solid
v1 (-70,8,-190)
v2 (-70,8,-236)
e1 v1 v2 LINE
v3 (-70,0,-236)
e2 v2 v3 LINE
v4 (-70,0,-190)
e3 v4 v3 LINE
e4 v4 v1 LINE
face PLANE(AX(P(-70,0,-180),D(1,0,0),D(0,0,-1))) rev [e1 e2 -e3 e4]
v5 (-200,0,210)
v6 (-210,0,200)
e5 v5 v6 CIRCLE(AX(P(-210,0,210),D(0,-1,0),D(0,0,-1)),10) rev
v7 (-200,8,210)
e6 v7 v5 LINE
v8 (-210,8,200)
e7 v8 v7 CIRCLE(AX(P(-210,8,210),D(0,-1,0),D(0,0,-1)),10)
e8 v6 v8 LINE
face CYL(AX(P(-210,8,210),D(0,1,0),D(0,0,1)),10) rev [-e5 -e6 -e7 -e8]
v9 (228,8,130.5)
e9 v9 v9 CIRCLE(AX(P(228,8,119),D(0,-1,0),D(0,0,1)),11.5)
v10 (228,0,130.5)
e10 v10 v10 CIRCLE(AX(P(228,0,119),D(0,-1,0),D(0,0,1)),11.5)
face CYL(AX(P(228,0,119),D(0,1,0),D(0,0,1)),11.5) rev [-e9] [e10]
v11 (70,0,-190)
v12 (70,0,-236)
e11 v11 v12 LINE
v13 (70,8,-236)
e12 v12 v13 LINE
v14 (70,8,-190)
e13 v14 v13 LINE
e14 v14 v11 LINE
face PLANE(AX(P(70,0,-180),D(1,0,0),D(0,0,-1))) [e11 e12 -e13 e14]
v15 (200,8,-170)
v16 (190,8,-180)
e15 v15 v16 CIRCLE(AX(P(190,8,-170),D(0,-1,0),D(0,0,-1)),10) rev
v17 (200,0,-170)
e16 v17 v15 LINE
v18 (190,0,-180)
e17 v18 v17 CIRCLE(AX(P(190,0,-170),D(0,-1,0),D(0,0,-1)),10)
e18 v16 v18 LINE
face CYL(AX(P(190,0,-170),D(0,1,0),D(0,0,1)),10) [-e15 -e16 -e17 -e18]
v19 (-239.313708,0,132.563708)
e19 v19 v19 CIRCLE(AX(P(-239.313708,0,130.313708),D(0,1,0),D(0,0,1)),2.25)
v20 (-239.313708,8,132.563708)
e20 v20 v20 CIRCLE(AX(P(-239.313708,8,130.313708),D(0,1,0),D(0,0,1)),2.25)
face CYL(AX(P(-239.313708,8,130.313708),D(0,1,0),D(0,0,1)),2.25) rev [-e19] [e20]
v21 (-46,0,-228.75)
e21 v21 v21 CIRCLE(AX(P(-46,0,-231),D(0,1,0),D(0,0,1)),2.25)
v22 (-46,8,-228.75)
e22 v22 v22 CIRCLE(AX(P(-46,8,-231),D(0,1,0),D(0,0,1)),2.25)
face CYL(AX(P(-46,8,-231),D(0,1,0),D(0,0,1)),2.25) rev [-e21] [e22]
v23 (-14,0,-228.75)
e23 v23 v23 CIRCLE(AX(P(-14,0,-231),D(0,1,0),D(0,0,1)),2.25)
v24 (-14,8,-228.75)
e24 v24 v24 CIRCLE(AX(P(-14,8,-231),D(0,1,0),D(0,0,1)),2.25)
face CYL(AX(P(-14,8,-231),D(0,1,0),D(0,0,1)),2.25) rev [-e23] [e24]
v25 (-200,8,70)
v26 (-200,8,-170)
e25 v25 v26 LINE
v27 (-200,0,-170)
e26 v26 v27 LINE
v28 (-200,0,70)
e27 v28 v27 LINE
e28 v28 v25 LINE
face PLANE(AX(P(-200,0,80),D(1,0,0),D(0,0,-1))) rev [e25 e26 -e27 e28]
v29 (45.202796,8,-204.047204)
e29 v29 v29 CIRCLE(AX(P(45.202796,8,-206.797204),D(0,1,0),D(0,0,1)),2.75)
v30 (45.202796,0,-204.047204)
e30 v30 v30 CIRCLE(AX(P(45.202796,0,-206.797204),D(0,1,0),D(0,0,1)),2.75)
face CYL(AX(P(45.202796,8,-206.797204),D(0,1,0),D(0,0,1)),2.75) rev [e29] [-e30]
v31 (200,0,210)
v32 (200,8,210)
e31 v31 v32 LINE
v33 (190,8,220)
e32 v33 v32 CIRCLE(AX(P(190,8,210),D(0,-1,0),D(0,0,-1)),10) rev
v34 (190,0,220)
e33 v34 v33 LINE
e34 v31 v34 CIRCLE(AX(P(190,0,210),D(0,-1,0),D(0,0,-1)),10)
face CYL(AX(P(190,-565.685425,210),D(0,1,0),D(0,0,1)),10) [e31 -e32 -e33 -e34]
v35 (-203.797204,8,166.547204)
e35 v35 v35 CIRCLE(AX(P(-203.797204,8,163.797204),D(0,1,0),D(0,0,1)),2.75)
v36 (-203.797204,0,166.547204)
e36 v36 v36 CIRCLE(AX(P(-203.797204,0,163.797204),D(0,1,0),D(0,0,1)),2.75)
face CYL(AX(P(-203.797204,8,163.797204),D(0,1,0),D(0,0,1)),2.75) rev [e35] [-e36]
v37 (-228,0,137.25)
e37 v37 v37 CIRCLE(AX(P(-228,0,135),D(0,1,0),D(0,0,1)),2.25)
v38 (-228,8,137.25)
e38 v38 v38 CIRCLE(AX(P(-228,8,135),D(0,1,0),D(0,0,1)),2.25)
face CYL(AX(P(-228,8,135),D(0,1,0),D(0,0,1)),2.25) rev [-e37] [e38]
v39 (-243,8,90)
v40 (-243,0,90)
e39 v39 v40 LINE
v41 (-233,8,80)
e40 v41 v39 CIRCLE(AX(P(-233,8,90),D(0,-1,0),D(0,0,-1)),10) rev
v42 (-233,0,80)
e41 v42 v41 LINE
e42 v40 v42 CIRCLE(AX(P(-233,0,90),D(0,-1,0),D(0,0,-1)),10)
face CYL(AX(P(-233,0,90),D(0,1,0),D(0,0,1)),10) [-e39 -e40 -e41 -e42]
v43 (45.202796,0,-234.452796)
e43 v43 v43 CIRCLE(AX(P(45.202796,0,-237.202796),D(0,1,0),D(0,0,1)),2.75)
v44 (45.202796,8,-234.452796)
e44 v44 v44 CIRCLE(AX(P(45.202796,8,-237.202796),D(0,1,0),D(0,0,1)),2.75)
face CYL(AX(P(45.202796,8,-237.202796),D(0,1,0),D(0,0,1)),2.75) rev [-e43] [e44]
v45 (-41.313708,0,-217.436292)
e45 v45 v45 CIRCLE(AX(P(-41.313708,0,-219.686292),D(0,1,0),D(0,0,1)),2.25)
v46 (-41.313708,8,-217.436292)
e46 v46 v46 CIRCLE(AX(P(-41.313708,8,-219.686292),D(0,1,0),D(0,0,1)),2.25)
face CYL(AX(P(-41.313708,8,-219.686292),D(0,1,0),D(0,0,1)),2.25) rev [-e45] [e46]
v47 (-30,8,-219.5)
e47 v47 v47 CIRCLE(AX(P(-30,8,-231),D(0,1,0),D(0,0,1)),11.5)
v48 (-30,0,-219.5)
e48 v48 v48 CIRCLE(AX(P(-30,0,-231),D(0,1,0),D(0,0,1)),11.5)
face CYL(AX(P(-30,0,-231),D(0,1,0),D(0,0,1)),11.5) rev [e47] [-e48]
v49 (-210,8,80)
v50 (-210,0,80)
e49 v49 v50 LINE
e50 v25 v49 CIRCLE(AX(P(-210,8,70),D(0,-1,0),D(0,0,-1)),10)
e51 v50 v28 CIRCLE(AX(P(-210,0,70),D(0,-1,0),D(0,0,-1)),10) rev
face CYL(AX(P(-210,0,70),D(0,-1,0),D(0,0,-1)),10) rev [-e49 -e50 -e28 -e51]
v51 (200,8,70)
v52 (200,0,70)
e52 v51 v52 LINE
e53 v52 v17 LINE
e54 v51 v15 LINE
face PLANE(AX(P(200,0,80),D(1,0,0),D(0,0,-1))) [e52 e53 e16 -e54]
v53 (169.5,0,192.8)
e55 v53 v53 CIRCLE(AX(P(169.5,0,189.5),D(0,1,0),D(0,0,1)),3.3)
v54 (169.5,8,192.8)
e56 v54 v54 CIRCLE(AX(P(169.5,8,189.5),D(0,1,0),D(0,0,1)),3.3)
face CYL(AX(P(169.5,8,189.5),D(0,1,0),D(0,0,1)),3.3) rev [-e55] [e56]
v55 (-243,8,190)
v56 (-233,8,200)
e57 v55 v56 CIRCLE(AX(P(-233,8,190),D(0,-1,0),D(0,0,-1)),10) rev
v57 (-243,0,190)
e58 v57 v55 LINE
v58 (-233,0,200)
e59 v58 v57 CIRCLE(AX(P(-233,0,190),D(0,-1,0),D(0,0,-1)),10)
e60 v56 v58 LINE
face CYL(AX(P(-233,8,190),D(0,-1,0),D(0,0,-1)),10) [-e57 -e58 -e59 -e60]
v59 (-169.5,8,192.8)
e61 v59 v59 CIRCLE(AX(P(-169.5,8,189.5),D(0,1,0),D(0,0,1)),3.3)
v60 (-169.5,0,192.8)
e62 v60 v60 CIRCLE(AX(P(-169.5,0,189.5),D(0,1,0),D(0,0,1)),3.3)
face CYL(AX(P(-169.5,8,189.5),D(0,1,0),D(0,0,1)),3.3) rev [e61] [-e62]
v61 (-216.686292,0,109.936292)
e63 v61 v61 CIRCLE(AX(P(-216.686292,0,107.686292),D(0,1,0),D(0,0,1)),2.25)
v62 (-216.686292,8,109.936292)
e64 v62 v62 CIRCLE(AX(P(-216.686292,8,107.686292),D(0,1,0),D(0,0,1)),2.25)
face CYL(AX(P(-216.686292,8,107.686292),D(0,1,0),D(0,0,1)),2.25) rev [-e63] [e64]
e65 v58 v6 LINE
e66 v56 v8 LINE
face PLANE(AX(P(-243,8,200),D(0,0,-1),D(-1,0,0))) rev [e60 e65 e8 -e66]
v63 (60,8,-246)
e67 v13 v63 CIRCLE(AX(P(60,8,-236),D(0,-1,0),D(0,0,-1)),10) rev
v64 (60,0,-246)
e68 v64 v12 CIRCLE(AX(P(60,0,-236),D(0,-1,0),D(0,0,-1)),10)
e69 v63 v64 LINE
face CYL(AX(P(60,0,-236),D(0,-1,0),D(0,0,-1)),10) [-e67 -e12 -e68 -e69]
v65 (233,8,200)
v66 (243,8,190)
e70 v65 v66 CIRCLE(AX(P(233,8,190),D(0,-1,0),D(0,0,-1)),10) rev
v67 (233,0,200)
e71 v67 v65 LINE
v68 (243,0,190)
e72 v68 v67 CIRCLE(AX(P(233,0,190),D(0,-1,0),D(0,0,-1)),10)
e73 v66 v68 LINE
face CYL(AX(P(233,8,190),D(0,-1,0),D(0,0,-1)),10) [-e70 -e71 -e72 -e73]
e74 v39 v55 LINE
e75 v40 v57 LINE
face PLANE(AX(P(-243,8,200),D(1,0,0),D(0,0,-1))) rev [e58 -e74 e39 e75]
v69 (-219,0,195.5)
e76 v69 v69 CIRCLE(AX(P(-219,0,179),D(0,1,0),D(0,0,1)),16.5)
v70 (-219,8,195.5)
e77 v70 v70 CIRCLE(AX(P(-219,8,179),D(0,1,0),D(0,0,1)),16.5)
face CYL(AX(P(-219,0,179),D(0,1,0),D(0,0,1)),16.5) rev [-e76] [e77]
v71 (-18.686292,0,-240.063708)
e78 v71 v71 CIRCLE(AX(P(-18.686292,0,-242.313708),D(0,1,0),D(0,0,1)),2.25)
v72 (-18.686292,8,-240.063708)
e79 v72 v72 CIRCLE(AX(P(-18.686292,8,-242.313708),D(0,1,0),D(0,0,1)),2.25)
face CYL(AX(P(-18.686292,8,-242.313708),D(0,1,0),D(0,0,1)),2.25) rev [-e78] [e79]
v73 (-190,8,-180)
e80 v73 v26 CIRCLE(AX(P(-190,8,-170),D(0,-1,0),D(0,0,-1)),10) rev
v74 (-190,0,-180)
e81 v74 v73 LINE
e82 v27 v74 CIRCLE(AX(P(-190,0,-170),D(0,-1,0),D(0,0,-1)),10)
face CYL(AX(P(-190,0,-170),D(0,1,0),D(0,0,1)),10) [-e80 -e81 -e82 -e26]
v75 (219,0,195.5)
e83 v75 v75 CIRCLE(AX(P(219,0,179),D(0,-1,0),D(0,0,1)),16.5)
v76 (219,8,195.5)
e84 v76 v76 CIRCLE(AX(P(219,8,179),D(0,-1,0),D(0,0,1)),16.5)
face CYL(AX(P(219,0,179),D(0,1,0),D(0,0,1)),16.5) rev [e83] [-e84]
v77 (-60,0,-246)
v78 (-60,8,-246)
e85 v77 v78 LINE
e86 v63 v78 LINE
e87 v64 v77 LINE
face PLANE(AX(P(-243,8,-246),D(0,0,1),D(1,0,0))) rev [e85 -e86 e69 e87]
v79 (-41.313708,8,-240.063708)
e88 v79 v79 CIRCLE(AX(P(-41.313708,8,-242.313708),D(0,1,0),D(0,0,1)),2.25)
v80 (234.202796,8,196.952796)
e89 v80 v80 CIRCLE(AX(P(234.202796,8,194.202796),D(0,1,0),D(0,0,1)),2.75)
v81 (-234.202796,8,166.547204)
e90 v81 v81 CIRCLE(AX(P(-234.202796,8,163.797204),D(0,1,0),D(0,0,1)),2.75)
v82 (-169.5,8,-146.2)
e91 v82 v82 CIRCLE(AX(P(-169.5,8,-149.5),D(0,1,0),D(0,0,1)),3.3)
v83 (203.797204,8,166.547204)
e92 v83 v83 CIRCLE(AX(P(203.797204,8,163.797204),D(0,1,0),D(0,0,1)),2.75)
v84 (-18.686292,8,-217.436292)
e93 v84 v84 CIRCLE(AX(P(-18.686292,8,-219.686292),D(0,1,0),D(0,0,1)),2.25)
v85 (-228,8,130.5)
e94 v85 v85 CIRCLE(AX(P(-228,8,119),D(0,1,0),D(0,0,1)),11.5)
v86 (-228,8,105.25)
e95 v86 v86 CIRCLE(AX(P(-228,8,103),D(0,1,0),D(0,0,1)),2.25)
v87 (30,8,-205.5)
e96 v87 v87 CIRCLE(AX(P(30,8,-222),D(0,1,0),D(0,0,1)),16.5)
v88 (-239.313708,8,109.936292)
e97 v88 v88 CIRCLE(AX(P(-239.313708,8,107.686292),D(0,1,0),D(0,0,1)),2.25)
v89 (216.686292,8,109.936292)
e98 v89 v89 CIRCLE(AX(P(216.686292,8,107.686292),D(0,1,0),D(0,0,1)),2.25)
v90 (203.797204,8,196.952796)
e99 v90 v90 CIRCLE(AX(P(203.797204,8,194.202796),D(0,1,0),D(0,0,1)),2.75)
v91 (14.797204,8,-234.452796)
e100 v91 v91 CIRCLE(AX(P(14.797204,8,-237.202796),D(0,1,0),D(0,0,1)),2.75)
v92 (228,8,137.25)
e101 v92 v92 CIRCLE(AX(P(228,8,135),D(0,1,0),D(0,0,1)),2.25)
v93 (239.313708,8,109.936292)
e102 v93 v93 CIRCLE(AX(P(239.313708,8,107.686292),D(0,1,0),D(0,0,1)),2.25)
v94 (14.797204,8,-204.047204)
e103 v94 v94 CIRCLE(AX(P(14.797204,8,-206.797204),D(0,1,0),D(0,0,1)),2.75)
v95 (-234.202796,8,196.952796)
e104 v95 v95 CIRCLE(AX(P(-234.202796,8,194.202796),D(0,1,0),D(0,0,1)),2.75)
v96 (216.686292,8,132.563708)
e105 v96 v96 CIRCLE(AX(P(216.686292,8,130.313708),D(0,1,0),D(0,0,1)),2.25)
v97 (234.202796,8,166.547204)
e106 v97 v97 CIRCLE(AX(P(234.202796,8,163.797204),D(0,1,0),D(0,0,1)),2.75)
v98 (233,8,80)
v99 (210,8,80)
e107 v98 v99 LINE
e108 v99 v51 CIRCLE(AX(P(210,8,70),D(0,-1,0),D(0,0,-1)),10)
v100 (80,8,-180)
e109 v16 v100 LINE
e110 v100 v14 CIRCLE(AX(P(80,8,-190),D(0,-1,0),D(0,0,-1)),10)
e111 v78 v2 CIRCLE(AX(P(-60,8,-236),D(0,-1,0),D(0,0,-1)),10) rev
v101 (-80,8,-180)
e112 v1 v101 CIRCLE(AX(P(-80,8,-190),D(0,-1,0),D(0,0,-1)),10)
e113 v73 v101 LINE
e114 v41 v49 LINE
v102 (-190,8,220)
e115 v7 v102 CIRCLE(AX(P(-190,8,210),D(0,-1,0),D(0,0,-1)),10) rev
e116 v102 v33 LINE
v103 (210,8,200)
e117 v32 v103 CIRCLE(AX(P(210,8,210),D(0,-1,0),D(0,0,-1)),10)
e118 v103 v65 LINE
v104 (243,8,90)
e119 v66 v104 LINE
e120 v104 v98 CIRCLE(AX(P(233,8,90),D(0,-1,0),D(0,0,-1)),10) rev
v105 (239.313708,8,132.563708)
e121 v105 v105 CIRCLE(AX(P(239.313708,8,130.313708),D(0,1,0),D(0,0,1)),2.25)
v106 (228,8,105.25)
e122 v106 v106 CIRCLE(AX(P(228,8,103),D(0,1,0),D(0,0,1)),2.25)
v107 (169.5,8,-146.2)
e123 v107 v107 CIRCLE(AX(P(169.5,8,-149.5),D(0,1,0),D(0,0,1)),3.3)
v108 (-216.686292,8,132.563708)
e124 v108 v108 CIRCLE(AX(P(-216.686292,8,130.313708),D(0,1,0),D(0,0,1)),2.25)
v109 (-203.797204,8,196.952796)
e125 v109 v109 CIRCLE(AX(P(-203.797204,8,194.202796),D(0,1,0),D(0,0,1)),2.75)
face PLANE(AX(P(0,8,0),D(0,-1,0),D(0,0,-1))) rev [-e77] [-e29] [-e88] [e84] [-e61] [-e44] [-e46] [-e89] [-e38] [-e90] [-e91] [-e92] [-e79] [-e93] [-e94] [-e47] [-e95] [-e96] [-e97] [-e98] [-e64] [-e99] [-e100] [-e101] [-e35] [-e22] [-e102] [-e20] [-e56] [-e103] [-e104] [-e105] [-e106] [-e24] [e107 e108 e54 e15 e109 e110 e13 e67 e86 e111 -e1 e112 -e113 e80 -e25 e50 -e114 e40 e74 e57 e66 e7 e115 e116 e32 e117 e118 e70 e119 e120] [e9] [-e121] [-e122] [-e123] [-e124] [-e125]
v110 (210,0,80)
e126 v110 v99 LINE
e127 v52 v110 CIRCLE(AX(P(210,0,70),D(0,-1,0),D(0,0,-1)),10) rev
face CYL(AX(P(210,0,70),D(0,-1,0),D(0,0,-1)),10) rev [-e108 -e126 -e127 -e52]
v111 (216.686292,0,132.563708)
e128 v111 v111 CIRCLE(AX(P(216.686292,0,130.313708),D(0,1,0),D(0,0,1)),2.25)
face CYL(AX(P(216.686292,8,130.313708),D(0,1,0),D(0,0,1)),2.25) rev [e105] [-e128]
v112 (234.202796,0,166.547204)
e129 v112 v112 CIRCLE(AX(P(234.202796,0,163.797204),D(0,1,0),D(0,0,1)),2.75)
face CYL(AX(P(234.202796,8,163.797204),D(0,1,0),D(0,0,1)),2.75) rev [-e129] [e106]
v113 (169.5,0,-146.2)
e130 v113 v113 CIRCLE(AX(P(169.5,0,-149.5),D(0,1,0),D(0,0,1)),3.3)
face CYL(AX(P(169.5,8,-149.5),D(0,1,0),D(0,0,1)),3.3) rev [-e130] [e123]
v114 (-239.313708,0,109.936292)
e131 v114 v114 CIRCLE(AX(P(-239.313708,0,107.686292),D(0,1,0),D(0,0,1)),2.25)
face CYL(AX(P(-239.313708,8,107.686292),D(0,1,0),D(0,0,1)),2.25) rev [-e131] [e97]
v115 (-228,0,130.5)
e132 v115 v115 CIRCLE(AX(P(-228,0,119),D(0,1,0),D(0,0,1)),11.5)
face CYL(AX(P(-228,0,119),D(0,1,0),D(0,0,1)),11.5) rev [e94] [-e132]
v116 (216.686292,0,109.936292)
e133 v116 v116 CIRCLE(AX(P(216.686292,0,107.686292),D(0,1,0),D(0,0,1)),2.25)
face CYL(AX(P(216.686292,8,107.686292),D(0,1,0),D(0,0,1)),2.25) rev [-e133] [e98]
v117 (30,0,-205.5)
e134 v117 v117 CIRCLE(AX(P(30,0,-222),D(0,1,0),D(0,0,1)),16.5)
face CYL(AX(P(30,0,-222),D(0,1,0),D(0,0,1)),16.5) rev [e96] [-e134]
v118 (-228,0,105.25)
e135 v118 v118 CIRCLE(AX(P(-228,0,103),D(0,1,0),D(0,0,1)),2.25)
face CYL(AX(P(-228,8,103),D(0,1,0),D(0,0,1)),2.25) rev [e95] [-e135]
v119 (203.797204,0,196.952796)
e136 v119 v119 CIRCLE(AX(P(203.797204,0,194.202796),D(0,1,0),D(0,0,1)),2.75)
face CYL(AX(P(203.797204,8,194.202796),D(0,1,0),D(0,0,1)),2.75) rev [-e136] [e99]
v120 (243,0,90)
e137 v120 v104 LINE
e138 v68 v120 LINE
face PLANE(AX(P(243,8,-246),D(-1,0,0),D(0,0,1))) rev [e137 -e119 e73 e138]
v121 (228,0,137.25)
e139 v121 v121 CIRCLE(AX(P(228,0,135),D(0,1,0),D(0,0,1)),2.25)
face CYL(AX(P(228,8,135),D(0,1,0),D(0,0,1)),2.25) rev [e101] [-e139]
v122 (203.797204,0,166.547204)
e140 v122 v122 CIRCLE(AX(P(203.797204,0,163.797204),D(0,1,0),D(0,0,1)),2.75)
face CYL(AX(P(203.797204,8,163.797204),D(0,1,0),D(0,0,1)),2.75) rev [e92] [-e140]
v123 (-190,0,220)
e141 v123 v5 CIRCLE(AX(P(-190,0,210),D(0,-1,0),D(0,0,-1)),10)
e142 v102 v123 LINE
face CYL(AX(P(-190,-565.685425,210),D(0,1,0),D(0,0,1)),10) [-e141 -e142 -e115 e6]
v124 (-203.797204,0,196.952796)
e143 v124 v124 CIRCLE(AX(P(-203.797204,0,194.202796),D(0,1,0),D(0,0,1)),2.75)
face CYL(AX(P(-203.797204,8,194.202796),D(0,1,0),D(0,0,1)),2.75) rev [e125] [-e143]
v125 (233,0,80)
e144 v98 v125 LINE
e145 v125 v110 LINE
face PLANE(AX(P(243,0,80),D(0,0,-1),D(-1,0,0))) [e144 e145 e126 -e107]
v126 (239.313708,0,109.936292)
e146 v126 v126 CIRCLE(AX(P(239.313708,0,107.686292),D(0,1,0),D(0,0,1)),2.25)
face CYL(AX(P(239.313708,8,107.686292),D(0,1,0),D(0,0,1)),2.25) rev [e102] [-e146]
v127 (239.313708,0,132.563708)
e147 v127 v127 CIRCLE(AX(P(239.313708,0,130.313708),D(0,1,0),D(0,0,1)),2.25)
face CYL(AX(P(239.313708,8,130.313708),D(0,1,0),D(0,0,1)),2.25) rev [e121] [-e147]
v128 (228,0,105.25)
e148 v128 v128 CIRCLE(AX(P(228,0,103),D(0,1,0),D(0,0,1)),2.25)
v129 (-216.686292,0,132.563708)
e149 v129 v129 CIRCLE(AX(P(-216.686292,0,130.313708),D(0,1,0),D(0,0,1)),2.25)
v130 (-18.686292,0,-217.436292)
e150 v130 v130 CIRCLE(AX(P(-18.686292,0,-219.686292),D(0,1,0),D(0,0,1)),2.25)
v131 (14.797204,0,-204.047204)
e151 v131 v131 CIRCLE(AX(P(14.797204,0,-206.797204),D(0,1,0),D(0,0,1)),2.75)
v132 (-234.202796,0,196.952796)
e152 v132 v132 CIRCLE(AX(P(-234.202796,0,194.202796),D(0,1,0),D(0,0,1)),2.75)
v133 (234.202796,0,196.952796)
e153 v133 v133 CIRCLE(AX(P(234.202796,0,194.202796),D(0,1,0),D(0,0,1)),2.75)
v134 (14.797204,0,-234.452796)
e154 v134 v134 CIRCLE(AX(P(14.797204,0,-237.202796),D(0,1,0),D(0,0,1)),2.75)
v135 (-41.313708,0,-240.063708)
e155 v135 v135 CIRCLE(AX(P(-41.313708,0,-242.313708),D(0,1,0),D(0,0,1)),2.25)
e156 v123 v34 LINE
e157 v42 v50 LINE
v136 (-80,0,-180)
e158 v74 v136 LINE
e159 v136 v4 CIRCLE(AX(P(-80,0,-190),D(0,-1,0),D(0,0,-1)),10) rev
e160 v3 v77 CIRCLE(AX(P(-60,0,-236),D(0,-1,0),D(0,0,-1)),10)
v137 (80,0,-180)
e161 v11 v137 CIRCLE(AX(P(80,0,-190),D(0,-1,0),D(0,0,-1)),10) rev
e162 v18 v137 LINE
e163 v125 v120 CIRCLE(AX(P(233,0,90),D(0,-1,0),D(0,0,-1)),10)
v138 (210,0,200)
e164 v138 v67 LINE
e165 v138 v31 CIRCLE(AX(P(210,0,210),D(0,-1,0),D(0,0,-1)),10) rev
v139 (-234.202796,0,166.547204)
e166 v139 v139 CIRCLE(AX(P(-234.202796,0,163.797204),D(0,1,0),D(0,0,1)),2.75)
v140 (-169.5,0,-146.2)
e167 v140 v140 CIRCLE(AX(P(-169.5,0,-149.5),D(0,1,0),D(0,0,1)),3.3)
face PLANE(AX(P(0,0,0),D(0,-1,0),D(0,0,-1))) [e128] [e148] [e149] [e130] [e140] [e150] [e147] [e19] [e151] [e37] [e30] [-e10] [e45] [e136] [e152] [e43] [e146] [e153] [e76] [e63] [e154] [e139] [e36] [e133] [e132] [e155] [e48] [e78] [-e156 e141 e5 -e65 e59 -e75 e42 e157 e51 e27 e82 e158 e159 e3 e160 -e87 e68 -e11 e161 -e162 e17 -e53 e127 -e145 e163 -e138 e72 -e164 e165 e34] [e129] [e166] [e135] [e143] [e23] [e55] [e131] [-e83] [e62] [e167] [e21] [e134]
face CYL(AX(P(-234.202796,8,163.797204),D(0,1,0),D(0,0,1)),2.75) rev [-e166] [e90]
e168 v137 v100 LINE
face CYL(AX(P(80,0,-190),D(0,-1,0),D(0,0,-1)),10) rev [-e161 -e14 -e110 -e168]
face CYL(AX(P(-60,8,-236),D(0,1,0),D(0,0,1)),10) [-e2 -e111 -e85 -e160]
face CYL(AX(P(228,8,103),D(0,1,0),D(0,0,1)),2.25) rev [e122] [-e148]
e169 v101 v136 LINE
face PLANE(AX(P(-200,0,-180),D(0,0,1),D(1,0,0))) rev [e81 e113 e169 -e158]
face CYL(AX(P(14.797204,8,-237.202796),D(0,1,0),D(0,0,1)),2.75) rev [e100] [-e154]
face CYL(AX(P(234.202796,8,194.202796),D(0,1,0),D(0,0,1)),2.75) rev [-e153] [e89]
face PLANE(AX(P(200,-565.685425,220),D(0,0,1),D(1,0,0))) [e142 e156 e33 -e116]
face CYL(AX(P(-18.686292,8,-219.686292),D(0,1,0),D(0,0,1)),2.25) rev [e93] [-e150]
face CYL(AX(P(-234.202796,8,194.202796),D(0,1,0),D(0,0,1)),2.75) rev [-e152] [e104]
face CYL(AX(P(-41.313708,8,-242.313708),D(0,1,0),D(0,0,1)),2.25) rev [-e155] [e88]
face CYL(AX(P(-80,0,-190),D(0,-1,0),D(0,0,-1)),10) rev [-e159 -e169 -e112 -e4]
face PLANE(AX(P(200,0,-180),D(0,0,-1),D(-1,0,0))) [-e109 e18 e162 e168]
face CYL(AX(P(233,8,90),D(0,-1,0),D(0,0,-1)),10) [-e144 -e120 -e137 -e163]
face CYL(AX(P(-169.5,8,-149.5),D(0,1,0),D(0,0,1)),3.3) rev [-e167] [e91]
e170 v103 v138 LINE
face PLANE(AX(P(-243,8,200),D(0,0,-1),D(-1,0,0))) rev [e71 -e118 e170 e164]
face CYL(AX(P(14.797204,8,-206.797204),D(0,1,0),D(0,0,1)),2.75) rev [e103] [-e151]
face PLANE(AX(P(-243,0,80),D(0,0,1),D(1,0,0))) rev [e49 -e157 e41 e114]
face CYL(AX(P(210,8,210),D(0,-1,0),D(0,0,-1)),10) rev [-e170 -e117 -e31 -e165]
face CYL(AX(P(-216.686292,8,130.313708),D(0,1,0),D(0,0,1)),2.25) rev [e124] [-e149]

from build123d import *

# Parameters (mm, degrees)
SKETCH2_W            = 486
SKETCH2_H            = 446
BOSS_EXTRUDE1_DEPTH  = 8
M5_CLEARANCE_HOLE1_D = 5.5
M4_CLEARANCE_HOLE1_D = 4.5
SKETCH8_R            = 11.5
SKETCH8_R_2          = 16.5
CUT_EXTRUDE1_DEPTH   = 346.874254607
M5_CLEARANCE_HOLE2_D = 5.5
M4_CLEARANCE_HOLE2_D = 4.5
SKETCH13_R           = 11.5
SKETCH13_R_2         = 16.5
CUT_EXTRUDE2_DEPTH   = 346.874254607
CUT_EXTRUDE5_DEPTH   = 346.874254607
SKETCH20_W           = 400
SKETCH20_H           = 400
BOSS_EXTRUDE2_DEPTH  = 8
FILLET3_R            = 10
M6_CLEARANCE_HOLE1_D = 6.6


with BuildPart() as part:
    # Sketch2 → Boss-Extrude1 (new body)
    with BuildSketch(Plane(origin=(0, 0, 0), x_dir=(1, 0, 0), z_dir=(0, 1, 0))):
        with Locations((0, 23)):
            Rectangle(SKETCH2_W, SKETCH2_H)
    extrude(amount=BOSS_EXTRUDE1_DEPTH)

    # M5 Clearance Hole1 (through all)
    with Locations(Plane(origin=(0, 8, 0), x_dir=(1, 0, 0), z_dir=(0, 1, 0))):
        with Locations((-234.202795796, -163.797204204), (-203.797204204, -163.797204204), (-203.797204204, -194.202795796), (-234.202795796, -194.202795796)):
            m5_clearance_hole1 = Hole(M5_CLEARANCE_HOLE1_D / 2)

    # M4 Clearance Hole1 (through all)
    with Locations(Plane(origin=(0, 8, 0), x_dir=(1, 0, 0), z_dir=(0, 1, 0))):
        with Locations((-228, -135), (-216.686291501, -130.313708499), (-216.686291501, -107.686291501), (-228, -103), (-239.313708499, -107.686291501), (-239.313708499, -130.313708499)):
            m4_clearance_hole1 = Hole(M4_CLEARANCE_HOLE1_D / 2)

    # Sketch8 → Cut-Extrude1 (cut, through all)
    with BuildSketch(Plane(origin=(0, 8, 0), x_dir=(1, 0, 0), z_dir=(0, 1, 0))):
        with Locations(Location((-228, -119, 0), (0, 0, 270))):
            Circle(SKETCH8_R)
        with Locations(Location((-219, -179, 0), (0, 0, 270))):
            Circle(SKETCH8_R_2)
    cut_extrude1 = extrude(amount=-CUT_EXTRUDE1_DEPTH, mode=Mode.SUBTRACT)

    # Mirror1: M5 Clearance Hole1, M4 Clearance Hole1, Cut-Extrude1 across plane
    add(m5_clearance_hole1.mirror(Plane(origin=(0, 0, 0), x_dir=(0, 0, 1), z_dir=(1, 0, 0))), mode=Mode.SUBTRACT)
    add(m4_clearance_hole1.mirror(Plane(origin=(0, 0, 0), x_dir=(0, 0, 1), z_dir=(1, 0, 0))), mode=Mode.SUBTRACT)
    add(cut_extrude1.mirror(Plane(origin=(0, 0, 0), x_dir=(0, 0, 1), z_dir=(1, 0, 0))), mode=Mode.SUBTRACT)

    # M5 Clearance Hole2 (through all)
    with Locations(Plane(origin=(0, 8, 0), x_dir=(1, 0, 0), z_dir=(0, 1, 0))):
        with Locations((45.202795796, 206.797204204), (14.797204204, 206.797204204), (14.797204204, 237.202795796), (45.202795796, 237.202795796)):
            Hole(M5_CLEARANCE_HOLE2_D / 2)

    # M4 Clearance Hole2 (through all)
    with Locations(Plane(origin=(0, 8, 0), x_dir=(1, 0, 0), z_dir=(0, 1, 0))):
        with Locations((-41.313708499, 219.686291501), (-46, 231), (-41.313708499, 242.313708499), (-18.686291501, 242.313708499), (-14, 231), (-18.686291501, 219.686291501)):
            Hole(M4_CLEARANCE_HOLE2_D / 2)

    # Sketch13 → Cut-Extrude2 (cut, through all)
    with BuildSketch(Plane(origin=(0, 8, 0), x_dir=(1, 0, 0), z_dir=(0, 1, 0))):
        with Locations(Location((-30, 231, 0), (0, 0, 270))):
            Circle(SKETCH13_R)
        with Locations(Location((30, 222, 0), (0, 0, 270))):
            Circle(SKETCH13_R_2)
    extrude(amount=-CUT_EXTRUDE2_DEPTH, mode=Mode.SUBTRACT)

    # Sketch19 → Cut-Extrude5 (cut, through all)
    with BuildSketch(Plane(origin=(0, 8, 0), x_dir=(1, 0, 0), z_dir=(0, 1, 0))):
        Polygon((-243, -80), (-200, -80), (-200, 180), (-70, 180), (-70, 246), (-243, 246), align=None)
    cut_extrude5 = extrude(amount=-CUT_EXTRUDE5_DEPTH, mode=Mode.SUBTRACT)

    # Mirror2: Cut-Extrude5 across plane
    add(cut_extrude5.mirror(Plane(origin=(0, 0, 0), x_dir=(0, 0, 1), z_dir=(1, 0, 0))), mode=Mode.SUBTRACT)

    # Sketch20 → Boss-Extrude2 (add)
    with BuildSketch(Plane(origin=(0, 8, 0), x_dir=(1, 0, 0), z_dir=(0, 1, 0))):
        with Locations((0, -20)):
            Rectangle(SKETCH20_W, SKETCH20_H)
    extrude(amount=-BOSS_EXTRUDE2_DEPTH)

    # Fillet3
    fillet3_edges = [part.edges().sort_by_distance(p)[0] for p in [
        (-243, 4, 80),
        (-70, 4, -246),
        (-70, 4, -180),
        (-200, 4, -180),
        (-200, 4, 80),
        (243, 4, 80),
        (200, 4, 80),
        (200, 4, -180),
        (70, 4, -180),
        (70, 4, -246),
        (-200, 4, 220),
        (200, 4, 200),
        (-200, 4, 200),
        (200, 4, 220),
        (243, 4, 200),
        (-243, 4, 200),
    ]]
    fillet(fillet3_edges, radius=FILLET3_R - 0.0001)  # a hair under: the kernel refuses the full size

    # M6 Clearance Hole1 (through all)
    with Locations(Plane(origin=(0, 8, 0), x_dir=(1, 0, 0), z_dir=(0, 1, 0))):
        with Locations((-169.5, -189.5), (-169.5, 149.5), (169.5, 149.5), (169.5, -189.5)):
            Hole(M6_CLEARANCE_HOLE1_D / 2)


solid = part.part
